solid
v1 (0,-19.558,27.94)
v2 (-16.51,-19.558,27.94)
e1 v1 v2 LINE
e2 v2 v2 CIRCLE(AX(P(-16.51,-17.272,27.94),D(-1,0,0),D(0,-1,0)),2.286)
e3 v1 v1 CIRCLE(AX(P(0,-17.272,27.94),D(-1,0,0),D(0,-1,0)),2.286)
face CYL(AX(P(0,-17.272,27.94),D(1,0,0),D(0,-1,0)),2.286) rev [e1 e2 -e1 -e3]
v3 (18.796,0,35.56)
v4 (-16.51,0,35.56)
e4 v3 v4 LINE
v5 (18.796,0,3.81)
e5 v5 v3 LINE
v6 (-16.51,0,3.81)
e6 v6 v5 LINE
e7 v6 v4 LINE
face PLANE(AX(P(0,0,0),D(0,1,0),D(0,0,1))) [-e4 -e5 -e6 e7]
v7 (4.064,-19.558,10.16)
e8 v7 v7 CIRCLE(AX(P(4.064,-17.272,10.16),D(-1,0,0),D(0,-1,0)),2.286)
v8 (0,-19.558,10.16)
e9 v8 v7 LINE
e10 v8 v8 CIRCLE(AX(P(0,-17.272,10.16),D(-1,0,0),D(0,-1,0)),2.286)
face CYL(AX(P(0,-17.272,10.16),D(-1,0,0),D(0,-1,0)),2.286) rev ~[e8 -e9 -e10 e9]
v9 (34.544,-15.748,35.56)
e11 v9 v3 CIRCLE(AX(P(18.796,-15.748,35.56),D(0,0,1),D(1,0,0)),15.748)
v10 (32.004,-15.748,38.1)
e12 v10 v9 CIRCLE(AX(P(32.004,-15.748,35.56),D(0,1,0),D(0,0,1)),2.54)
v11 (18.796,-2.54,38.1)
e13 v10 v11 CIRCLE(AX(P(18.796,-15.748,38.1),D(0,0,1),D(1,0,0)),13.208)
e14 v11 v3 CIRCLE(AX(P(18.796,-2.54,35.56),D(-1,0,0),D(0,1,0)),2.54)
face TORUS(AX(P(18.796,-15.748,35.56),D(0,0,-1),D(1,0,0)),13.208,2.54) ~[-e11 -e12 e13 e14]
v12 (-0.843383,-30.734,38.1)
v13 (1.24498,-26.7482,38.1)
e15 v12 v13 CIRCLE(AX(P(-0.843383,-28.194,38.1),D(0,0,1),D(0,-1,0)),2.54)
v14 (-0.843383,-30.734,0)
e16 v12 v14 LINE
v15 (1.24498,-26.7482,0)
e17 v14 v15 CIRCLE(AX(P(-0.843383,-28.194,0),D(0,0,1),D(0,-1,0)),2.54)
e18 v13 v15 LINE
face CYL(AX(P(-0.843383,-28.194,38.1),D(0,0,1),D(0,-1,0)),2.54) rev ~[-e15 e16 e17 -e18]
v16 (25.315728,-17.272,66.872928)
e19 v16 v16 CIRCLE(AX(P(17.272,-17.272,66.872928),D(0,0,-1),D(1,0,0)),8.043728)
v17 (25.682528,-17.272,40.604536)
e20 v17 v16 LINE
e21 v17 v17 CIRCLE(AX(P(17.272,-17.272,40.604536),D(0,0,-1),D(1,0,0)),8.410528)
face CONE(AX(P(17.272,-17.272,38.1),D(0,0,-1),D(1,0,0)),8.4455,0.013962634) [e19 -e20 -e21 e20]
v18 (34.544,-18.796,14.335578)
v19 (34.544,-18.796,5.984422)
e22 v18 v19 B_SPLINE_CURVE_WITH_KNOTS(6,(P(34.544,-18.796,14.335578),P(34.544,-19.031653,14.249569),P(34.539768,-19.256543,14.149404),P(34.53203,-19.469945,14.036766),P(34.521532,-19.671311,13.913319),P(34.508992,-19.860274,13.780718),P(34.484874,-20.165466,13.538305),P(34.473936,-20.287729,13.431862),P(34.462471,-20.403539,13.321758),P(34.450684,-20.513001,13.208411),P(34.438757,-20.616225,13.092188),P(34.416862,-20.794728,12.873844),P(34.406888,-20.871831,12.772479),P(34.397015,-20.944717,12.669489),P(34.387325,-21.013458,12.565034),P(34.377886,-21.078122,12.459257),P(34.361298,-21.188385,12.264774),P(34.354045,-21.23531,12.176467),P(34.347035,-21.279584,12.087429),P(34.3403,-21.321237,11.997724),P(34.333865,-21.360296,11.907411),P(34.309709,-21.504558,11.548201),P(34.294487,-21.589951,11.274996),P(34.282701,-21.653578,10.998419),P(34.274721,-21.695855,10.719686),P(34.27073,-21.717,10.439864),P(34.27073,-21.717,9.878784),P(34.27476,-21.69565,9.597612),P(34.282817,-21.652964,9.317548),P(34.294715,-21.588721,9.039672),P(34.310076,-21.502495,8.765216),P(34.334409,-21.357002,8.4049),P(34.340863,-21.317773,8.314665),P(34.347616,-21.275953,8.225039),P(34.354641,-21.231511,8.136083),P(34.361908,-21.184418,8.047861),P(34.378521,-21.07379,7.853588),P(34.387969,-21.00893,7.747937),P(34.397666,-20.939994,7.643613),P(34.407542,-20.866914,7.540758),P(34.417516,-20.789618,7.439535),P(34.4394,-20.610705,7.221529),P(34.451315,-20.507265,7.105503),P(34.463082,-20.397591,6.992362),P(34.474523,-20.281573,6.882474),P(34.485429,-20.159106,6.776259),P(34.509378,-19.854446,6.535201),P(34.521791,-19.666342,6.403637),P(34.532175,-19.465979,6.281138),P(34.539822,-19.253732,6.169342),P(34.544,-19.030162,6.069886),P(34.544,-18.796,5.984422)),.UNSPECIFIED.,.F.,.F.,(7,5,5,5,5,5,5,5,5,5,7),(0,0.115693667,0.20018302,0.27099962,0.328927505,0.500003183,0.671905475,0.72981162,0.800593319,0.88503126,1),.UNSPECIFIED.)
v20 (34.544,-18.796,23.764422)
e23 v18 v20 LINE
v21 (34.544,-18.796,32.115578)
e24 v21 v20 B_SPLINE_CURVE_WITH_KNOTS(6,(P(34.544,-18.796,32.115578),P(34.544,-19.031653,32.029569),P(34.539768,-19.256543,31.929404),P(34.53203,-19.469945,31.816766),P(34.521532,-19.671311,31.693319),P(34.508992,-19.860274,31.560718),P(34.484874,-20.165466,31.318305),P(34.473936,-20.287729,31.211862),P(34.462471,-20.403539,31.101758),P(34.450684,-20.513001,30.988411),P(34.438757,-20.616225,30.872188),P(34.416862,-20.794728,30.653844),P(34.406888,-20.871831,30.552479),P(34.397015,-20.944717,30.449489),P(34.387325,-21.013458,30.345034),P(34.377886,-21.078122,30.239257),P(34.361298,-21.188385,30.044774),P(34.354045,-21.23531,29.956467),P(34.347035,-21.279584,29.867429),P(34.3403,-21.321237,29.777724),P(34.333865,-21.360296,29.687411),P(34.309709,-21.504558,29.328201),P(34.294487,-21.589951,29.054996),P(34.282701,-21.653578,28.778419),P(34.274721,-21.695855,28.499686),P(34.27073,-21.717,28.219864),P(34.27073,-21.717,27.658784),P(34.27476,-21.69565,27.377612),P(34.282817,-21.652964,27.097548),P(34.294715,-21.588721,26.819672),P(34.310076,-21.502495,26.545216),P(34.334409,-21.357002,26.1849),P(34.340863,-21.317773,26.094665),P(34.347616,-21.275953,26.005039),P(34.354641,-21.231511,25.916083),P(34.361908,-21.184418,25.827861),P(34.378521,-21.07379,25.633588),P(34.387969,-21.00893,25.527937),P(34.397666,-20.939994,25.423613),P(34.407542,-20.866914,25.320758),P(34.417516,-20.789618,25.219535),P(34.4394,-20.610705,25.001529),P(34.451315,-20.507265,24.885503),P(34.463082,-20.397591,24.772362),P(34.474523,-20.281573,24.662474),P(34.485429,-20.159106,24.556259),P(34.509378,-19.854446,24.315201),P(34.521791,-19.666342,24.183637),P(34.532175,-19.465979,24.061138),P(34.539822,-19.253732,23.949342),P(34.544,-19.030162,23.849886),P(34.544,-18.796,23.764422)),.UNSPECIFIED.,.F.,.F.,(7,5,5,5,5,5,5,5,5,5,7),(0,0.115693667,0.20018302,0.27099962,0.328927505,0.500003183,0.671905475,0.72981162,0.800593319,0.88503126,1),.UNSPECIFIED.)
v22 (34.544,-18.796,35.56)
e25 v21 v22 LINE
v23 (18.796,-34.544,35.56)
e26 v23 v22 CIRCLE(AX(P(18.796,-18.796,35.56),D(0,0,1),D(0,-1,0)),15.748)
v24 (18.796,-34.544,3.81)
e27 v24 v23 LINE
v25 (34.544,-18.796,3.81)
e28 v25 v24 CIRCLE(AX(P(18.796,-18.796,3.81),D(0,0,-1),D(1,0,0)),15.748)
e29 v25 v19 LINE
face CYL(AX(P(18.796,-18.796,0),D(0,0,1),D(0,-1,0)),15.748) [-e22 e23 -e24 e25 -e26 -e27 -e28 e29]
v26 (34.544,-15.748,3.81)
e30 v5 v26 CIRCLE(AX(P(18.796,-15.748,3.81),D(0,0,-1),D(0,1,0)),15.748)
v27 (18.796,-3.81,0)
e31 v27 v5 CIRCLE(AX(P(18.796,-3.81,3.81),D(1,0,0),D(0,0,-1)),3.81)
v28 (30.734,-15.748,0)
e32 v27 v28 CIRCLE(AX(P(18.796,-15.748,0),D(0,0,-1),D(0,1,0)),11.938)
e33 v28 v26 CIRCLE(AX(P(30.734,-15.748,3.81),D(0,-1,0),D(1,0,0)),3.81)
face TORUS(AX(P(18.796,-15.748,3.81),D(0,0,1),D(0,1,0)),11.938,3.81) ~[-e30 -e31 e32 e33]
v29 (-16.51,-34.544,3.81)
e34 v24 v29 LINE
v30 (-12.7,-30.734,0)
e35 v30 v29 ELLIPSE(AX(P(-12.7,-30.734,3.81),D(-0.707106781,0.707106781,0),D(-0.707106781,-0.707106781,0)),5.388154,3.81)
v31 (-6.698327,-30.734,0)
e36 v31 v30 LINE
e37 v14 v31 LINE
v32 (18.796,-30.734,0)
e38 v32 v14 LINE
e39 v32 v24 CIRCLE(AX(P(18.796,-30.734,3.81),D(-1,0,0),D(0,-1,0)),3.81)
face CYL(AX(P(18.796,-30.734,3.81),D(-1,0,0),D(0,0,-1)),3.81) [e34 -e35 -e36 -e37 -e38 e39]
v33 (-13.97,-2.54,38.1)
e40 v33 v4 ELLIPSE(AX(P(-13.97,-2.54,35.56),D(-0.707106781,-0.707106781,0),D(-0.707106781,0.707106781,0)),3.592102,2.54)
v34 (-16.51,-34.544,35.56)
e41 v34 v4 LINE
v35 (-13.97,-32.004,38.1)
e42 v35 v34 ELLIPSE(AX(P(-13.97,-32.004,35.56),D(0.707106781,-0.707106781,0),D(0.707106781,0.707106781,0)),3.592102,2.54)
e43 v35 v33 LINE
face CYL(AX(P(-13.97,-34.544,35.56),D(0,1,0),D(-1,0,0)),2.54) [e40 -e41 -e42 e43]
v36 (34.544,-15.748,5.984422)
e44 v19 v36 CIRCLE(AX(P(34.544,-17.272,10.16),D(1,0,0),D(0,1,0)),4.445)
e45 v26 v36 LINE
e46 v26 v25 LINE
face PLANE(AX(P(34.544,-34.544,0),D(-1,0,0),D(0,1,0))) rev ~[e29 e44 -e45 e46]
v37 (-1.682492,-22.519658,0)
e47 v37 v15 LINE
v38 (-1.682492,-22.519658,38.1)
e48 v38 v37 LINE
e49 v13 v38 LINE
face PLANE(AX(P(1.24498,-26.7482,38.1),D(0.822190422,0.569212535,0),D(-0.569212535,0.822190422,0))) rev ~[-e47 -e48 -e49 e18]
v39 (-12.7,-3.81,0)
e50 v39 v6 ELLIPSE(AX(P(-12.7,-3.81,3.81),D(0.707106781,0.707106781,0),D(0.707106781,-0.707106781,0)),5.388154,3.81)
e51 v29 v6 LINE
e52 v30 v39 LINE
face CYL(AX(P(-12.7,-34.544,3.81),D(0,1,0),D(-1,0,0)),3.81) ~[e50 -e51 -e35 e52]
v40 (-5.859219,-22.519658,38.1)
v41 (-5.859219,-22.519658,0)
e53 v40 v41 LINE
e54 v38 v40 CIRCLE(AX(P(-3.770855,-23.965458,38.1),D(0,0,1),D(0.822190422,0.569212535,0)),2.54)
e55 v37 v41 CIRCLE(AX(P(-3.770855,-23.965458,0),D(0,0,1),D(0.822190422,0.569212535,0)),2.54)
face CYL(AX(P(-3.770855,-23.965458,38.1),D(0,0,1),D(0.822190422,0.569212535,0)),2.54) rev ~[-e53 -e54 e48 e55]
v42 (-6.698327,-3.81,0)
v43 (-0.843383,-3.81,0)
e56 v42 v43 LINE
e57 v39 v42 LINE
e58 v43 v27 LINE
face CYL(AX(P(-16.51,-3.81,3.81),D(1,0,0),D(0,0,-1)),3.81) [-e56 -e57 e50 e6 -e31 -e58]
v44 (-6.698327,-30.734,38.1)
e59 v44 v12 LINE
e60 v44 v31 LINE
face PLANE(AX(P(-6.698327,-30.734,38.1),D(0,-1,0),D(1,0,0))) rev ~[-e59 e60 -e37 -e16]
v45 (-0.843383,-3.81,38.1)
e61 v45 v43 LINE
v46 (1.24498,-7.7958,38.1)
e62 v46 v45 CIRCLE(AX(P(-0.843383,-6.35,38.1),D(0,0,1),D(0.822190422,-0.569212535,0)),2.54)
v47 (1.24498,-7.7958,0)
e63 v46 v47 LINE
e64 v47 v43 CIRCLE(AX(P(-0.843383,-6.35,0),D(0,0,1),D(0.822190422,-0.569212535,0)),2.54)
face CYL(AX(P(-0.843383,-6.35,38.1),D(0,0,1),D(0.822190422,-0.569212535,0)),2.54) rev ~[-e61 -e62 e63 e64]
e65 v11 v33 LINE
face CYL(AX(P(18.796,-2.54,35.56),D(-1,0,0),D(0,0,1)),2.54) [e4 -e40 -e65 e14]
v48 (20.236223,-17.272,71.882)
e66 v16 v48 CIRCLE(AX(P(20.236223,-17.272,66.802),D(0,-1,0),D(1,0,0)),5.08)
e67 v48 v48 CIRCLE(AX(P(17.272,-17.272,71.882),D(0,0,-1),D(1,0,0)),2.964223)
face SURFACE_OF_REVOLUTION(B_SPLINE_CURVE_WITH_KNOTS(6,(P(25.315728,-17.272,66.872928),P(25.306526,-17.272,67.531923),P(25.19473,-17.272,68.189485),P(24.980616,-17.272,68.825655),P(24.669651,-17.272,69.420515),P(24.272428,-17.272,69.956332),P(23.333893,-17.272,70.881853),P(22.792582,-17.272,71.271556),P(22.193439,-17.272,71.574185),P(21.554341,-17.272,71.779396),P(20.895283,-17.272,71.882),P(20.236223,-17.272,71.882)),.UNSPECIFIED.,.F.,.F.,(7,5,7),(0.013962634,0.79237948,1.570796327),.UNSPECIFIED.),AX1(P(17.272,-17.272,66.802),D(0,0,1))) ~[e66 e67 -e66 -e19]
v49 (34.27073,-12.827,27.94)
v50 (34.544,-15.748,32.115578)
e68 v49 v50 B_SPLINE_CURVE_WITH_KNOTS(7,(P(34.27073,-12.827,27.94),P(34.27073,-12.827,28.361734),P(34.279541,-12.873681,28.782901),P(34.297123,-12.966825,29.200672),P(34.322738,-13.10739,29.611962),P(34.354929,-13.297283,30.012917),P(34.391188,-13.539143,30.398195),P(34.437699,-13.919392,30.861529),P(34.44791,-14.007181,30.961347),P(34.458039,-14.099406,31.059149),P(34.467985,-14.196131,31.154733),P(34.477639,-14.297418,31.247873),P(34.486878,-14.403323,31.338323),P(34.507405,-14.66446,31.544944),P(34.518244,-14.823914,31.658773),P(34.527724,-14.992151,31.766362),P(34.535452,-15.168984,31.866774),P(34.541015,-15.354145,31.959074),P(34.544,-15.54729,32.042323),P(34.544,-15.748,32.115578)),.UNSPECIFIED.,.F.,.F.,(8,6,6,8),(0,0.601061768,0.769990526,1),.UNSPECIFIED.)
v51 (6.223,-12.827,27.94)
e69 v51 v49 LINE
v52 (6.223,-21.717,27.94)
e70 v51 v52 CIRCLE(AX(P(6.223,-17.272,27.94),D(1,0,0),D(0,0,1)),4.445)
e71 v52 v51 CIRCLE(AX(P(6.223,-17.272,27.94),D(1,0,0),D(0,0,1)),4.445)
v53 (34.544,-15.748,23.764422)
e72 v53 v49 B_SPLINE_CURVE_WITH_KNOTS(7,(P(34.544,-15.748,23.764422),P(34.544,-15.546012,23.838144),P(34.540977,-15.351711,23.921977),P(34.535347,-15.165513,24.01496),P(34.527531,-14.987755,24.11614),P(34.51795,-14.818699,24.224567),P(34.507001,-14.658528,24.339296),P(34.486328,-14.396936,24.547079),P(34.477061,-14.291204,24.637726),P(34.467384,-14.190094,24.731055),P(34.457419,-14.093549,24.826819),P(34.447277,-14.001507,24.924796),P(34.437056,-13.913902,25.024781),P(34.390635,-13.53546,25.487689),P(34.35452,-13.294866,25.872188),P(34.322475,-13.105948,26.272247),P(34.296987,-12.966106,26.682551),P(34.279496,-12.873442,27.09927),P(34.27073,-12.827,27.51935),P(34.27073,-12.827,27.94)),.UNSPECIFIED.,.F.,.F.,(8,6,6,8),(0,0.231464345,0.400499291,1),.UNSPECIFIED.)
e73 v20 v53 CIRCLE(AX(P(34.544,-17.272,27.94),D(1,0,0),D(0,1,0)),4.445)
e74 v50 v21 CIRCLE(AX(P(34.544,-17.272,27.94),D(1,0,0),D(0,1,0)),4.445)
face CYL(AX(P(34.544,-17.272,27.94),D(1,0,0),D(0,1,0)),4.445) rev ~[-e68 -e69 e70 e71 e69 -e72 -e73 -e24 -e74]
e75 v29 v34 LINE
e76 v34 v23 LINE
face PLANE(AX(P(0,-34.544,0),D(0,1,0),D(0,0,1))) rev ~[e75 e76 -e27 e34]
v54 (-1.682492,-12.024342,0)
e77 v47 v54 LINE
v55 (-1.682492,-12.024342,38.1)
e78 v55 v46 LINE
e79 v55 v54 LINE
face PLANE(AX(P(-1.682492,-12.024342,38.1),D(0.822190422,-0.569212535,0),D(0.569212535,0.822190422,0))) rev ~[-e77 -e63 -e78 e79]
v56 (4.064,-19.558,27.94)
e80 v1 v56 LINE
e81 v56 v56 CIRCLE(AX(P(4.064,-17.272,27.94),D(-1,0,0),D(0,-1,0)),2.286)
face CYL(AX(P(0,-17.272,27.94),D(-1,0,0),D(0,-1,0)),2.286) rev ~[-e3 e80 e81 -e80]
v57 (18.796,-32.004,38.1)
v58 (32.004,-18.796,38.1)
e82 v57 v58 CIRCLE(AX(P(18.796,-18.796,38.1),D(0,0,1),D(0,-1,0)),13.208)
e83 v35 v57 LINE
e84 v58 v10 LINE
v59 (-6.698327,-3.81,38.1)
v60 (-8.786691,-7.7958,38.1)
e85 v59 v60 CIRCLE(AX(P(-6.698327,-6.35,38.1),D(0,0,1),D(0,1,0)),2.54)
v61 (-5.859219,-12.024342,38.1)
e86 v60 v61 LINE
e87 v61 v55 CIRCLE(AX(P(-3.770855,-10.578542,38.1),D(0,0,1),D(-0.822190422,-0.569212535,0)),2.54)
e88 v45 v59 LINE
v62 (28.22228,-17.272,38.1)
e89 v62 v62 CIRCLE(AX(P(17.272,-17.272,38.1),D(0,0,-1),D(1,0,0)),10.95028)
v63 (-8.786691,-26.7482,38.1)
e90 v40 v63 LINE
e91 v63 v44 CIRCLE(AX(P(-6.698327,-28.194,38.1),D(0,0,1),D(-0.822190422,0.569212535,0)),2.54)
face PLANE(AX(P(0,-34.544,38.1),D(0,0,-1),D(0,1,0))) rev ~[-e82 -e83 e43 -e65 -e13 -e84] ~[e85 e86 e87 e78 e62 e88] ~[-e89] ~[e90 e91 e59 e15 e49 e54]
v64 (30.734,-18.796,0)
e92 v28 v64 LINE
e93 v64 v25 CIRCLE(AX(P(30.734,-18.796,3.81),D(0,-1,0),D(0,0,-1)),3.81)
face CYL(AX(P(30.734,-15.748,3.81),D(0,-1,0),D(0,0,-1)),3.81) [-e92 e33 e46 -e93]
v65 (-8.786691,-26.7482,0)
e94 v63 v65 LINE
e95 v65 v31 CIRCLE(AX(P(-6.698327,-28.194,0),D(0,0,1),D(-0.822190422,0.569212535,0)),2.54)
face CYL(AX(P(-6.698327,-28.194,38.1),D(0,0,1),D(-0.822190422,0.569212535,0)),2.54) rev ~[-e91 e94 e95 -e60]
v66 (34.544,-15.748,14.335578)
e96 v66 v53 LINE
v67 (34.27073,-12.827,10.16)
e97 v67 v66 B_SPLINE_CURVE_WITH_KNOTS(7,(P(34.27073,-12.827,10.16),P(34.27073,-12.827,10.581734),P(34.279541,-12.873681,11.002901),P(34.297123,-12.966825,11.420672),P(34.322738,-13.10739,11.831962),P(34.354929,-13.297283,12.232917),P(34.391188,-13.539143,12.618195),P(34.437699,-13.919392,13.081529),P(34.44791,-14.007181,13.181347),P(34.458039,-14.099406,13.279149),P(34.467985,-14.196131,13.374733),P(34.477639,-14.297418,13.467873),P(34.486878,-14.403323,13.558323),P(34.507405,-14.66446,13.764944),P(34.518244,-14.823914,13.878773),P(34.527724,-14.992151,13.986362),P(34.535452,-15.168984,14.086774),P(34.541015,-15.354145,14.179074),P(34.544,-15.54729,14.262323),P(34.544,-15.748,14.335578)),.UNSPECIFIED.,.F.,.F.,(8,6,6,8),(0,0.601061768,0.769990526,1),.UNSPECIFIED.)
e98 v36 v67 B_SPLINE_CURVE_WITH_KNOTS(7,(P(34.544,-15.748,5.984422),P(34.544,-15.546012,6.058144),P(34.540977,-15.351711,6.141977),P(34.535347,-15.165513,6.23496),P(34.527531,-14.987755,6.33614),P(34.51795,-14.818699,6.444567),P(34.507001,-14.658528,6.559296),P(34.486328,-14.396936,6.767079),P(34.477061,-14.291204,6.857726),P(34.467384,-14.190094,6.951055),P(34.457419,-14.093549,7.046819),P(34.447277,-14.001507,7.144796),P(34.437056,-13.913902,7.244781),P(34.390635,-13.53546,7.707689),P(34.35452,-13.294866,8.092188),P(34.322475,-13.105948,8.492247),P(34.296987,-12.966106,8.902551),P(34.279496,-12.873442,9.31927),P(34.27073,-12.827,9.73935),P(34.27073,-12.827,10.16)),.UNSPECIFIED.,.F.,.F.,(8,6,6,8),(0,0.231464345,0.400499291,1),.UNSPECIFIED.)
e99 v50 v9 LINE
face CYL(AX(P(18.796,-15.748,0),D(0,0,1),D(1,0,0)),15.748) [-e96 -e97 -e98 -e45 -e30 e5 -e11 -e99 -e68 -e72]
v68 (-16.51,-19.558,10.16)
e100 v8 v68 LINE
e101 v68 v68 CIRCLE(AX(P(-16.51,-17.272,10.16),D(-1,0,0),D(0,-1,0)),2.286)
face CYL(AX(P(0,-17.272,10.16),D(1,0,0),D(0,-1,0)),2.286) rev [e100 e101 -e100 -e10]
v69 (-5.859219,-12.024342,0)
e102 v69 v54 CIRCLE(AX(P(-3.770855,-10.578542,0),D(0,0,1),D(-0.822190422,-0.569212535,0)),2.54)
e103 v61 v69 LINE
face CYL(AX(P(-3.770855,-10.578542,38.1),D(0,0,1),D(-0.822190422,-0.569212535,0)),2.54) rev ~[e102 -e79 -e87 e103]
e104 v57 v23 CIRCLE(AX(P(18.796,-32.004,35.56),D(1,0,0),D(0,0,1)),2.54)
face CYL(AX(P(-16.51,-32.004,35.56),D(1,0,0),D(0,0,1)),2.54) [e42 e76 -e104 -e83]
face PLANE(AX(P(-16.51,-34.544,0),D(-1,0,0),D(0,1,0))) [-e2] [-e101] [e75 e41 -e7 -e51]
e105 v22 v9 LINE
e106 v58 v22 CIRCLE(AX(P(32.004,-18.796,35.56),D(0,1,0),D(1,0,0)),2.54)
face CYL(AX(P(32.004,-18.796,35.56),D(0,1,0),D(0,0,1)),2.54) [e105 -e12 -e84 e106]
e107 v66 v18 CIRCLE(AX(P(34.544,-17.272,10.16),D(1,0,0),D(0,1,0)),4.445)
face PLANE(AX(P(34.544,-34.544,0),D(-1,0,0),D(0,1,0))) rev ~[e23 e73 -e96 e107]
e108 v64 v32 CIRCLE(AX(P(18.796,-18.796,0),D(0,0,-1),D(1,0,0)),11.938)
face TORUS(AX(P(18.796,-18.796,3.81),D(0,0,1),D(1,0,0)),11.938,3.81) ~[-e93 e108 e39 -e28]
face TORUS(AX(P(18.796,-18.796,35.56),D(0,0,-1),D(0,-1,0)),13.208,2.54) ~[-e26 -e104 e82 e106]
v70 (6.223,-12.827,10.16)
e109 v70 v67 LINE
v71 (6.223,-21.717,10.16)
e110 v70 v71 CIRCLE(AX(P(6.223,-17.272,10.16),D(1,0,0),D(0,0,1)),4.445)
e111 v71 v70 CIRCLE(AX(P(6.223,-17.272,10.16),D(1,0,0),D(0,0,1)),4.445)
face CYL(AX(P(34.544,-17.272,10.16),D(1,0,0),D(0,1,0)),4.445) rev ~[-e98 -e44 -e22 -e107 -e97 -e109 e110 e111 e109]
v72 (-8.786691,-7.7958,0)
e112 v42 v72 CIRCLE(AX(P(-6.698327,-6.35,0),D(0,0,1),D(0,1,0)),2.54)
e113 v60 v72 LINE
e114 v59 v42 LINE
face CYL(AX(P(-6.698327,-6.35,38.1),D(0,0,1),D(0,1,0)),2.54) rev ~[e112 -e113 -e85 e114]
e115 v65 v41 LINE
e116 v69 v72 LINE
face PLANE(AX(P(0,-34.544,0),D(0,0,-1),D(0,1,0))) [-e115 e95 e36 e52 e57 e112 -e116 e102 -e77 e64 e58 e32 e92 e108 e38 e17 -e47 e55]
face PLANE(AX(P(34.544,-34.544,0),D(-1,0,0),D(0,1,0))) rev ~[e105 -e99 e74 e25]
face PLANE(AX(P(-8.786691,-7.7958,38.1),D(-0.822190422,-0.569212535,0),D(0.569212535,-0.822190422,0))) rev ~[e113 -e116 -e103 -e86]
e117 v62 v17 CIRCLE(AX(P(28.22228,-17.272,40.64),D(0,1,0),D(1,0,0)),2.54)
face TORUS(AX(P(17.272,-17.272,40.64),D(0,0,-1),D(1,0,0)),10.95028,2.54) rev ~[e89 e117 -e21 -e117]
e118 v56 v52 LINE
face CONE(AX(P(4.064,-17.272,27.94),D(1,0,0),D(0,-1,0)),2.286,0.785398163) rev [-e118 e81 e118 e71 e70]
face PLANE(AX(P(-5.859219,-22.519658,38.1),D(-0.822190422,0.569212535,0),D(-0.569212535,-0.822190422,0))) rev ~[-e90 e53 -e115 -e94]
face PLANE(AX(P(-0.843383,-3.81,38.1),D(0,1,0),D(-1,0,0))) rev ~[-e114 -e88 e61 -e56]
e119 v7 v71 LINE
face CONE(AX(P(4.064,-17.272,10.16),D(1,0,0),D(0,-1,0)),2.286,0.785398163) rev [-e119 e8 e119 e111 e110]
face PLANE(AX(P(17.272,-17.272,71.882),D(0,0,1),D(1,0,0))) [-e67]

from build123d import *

# Parameters (mm, degrees)
F0_W         = 34.544
F0_H         = 34.544
F1_DEPTH     = 38.1
F3_R         = 15.748
F4_R         = 2.286
F5_DEPTH     = 34.545
F6_R         = 4.445
F7_DEPTH     = 27.94
F8_S5_R      = 4.445
F8_T6_DEPTH  = 8
F8_S11_R     = 4.445
F8_T12_DEPTH = 8
F9_DEPTH     = 16.51
F2_R         = 8.4455
F10_DEPTH    = 33.782
F10_TAPER    = 0.8
F11_R        = 2.54
F12_R        = 3.81
F13_R        = 5.08
F15_DEPTH    = 38.101


# Not quite as in the source:
# - a fillet or chamfer that OpenCascade refuses, or shapes differently, is made with other operations: its cross-section is extruded or revolved along the edge and cut away or added


with BuildPart() as f1:
    # F0 (on Top) → F1 (new body)
    with BuildSketch(Plane.XY):
        with Locations((17.272, -17.272)):
            Rectangle(F0_W, F0_H)
    extrude(amount=F1_DEPTH)

    # F3
    f3_edges = [f1.edges().sort_by_distance(p)[0] for p in [
        (34.544, -34.544, 19.05),
        (34.544, 0, 19.05),
    ]]
    fillet(f3_edges, radius=F3_R)

    # F4 (on face) → F5 (cut, through all)
    with BuildSketch(Plane(origin=(0, 0, 0), x_dir=(0, -1, 0), z_dir=(-1, 0, 0))):
        with Locations((17.272, 10.16)):
            Circle(F4_R)
        with Locations((17.272, 27.94)):
            Circle(F4_R)
    extrude(amount=-F5_DEPTH, mode=Mode.SUBTRACT)

    # F6 (on face) → F7 (cut)
    with BuildSketch(Plane.YZ.offset(34.544)):
        with Locations((-17.272, 27.94)):
            Circle(F6_R)
        with Locations((-17.272, 10.16)):
            Circle(F6_R)
    extrude(amount=-F7_DEPTH, mode=Mode.SUBTRACT)

    # F8: chamfer of 2.54 on 2 edges, made by hand


with BuildPart() as f8_tool2:
    # F8_s3 → F8_t4 (revolve)
    with BuildSketch(Plane.XY.offset(27.94)):
        Polygon((4.064, -19.558), (6.604, -22.098), (6.604, -19.558), align=None)
    revolve(axis=Axis((6.604, -17.272, 27.94), (-1, 0, 0)))

    # F8_s5 → F8_t6 (intersect, symmetric)
    with BuildSketch(Plane.YZ.offset(5.3)):
        with Locations((-17.272, 27.94)):
            Circle(F8_S5_R)
    extrude(amount=F8_T6_DEPTH, both=True, mode=Mode.INTERSECT)


with BuildPart() as f1_1:
    add(f1.part)

    # F8_t1: cut F8_tool2
    add(f8_tool2.part, mode=Mode.SUBTRACT)


with BuildPart() as f8_tool8:
    # F8_s9 → F8_t10 (revolve)
    with BuildSketch(Plane.XY.offset(10.16)):
        Polygon((4.064, -19.558), (6.604, -22.098), (6.604, -19.558), align=None)
    revolve(axis=Axis((6.604, -17.272, 10.16), (-1, 0, 0)))

    # F8_s11 → F8_t12 (intersect, symmetric)
    with BuildSketch(Plane.YZ.offset(5.3)):
        with Locations((-17.272, 10.16)):
            Circle(F8_S11_R)
    extrude(amount=F8_T12_DEPTH, both=True, mode=Mode.INTERSECT)


with BuildPart() as f1_2:
    add(f1_1.part)

    # F8_t7: cut F8_tool8
    add(f8_tool8.part, mode=Mode.SUBTRACT)

    # F9 (add): a face of the model
    f9_faces = [f1_2.faces().sort_by_distance(p)[0] for p in [
        (0, -17.272, 19.05),
    ]]
    extrude(f9_faces, amount=F9_DEPTH)

    # F2 (on face) → F10 (join)
    with BuildSketch(Plane.XY.offset(38.1)):
        with Locations((17.272, -17.272)):
            Circle(F2_R)
    extrude(amount=F10_DEPTH, taper=F10_TAPER)

    # F11
    f11_edges = [f1_2.edges().sort_by_distance(p)[0] for p in [
        (1.143, 0, 38.1),
        (-16.51, -17.272, 38.1),
        (29.931518, -4.612482, 38.1),
        (1.143, -34.544, 38.1),
        (34.544, -17.272, 38.1),
        (29.931518, -29.931518, 38.1),
        (8.8265, -17.272, 38.1),
    ]]
    fillet(f11_edges, radius=F11_R)

    # F12
    f12_edges = [f1_2.edges().sort_by_distance(p)[0] for p in [
        (1.143, 0, 0),
        (-16.51, -17.272, 0),
        (1.143, -34.544, 0),
        (29.931518, -29.931518, 0),
        (34.544, -17.272, 0),
        (29.931518, -4.612482, 0),
    ]]
    fillet(f12_edges, radius=F12_R)

    # F13
    f13_edges = [f1_2.edges().sort_by_distance(p)[0] for p in [
        (9.298216, -17.272, 71.882),
    ]]
    fillet(f13_edges, radius=F13_R)

    # F14 (on face) → F15 (cut, through all)
    with BuildSketch(Plane.XY.offset(38.1)):
        with BuildLine():
            ThreePointArc((-6.6983271655, -3.81), (-8.9482084501, -5.1711725294), (-8.7866908377, -7.7957998383))
            Line((-8.7866908377, -7.7957998383), (-5.8592190016, -12.0243421801))
            ThreePointArc((-5.8592190016, -12.0243421801), (-3.7708553294, -13.1185423418), (-1.6824916571, -12.0243421801))
            Line((-1.6824916571, -12.0243421801), (1.244980179, -7.7957998383))
            ThreePointArc((1.244980179, -7.7957998383), (1.4064977914, -5.1711725294), (-0.8433834932, -3.81))
            Line((-0.8433834932, -3.81), (-6.6983271655, -3.81))
        make_face()
        with BuildLine():
            ThreePointArc((-1.6824916571, -22.5196578199), (-3.7708553294, -21.4254576582), (-5.8592190016, -22.5196578199))
            Line((-5.8592190016, -22.5196578199), (-8.7866908377, -26.7482001617))
            ThreePointArc((-8.7866908377, -26.7482001617), (-8.9482084501, -29.3728274706), (-6.6983271655, -30.734))
            Line((-6.6983271655, -30.734), (-0.8433834932, -30.734))
            ThreePointArc((-0.8433834932, -30.734), (1.4064977914, -29.3728274706), (1.244980179, -26.7482001617))
            Line((1.244980179, -26.7482001617), (-1.6824916571, -22.5196578199))
        make_face()
    extrude(amount=-F15_DEPTH, mode=Mode.SUBTRACT)


solid = f1_2.part
